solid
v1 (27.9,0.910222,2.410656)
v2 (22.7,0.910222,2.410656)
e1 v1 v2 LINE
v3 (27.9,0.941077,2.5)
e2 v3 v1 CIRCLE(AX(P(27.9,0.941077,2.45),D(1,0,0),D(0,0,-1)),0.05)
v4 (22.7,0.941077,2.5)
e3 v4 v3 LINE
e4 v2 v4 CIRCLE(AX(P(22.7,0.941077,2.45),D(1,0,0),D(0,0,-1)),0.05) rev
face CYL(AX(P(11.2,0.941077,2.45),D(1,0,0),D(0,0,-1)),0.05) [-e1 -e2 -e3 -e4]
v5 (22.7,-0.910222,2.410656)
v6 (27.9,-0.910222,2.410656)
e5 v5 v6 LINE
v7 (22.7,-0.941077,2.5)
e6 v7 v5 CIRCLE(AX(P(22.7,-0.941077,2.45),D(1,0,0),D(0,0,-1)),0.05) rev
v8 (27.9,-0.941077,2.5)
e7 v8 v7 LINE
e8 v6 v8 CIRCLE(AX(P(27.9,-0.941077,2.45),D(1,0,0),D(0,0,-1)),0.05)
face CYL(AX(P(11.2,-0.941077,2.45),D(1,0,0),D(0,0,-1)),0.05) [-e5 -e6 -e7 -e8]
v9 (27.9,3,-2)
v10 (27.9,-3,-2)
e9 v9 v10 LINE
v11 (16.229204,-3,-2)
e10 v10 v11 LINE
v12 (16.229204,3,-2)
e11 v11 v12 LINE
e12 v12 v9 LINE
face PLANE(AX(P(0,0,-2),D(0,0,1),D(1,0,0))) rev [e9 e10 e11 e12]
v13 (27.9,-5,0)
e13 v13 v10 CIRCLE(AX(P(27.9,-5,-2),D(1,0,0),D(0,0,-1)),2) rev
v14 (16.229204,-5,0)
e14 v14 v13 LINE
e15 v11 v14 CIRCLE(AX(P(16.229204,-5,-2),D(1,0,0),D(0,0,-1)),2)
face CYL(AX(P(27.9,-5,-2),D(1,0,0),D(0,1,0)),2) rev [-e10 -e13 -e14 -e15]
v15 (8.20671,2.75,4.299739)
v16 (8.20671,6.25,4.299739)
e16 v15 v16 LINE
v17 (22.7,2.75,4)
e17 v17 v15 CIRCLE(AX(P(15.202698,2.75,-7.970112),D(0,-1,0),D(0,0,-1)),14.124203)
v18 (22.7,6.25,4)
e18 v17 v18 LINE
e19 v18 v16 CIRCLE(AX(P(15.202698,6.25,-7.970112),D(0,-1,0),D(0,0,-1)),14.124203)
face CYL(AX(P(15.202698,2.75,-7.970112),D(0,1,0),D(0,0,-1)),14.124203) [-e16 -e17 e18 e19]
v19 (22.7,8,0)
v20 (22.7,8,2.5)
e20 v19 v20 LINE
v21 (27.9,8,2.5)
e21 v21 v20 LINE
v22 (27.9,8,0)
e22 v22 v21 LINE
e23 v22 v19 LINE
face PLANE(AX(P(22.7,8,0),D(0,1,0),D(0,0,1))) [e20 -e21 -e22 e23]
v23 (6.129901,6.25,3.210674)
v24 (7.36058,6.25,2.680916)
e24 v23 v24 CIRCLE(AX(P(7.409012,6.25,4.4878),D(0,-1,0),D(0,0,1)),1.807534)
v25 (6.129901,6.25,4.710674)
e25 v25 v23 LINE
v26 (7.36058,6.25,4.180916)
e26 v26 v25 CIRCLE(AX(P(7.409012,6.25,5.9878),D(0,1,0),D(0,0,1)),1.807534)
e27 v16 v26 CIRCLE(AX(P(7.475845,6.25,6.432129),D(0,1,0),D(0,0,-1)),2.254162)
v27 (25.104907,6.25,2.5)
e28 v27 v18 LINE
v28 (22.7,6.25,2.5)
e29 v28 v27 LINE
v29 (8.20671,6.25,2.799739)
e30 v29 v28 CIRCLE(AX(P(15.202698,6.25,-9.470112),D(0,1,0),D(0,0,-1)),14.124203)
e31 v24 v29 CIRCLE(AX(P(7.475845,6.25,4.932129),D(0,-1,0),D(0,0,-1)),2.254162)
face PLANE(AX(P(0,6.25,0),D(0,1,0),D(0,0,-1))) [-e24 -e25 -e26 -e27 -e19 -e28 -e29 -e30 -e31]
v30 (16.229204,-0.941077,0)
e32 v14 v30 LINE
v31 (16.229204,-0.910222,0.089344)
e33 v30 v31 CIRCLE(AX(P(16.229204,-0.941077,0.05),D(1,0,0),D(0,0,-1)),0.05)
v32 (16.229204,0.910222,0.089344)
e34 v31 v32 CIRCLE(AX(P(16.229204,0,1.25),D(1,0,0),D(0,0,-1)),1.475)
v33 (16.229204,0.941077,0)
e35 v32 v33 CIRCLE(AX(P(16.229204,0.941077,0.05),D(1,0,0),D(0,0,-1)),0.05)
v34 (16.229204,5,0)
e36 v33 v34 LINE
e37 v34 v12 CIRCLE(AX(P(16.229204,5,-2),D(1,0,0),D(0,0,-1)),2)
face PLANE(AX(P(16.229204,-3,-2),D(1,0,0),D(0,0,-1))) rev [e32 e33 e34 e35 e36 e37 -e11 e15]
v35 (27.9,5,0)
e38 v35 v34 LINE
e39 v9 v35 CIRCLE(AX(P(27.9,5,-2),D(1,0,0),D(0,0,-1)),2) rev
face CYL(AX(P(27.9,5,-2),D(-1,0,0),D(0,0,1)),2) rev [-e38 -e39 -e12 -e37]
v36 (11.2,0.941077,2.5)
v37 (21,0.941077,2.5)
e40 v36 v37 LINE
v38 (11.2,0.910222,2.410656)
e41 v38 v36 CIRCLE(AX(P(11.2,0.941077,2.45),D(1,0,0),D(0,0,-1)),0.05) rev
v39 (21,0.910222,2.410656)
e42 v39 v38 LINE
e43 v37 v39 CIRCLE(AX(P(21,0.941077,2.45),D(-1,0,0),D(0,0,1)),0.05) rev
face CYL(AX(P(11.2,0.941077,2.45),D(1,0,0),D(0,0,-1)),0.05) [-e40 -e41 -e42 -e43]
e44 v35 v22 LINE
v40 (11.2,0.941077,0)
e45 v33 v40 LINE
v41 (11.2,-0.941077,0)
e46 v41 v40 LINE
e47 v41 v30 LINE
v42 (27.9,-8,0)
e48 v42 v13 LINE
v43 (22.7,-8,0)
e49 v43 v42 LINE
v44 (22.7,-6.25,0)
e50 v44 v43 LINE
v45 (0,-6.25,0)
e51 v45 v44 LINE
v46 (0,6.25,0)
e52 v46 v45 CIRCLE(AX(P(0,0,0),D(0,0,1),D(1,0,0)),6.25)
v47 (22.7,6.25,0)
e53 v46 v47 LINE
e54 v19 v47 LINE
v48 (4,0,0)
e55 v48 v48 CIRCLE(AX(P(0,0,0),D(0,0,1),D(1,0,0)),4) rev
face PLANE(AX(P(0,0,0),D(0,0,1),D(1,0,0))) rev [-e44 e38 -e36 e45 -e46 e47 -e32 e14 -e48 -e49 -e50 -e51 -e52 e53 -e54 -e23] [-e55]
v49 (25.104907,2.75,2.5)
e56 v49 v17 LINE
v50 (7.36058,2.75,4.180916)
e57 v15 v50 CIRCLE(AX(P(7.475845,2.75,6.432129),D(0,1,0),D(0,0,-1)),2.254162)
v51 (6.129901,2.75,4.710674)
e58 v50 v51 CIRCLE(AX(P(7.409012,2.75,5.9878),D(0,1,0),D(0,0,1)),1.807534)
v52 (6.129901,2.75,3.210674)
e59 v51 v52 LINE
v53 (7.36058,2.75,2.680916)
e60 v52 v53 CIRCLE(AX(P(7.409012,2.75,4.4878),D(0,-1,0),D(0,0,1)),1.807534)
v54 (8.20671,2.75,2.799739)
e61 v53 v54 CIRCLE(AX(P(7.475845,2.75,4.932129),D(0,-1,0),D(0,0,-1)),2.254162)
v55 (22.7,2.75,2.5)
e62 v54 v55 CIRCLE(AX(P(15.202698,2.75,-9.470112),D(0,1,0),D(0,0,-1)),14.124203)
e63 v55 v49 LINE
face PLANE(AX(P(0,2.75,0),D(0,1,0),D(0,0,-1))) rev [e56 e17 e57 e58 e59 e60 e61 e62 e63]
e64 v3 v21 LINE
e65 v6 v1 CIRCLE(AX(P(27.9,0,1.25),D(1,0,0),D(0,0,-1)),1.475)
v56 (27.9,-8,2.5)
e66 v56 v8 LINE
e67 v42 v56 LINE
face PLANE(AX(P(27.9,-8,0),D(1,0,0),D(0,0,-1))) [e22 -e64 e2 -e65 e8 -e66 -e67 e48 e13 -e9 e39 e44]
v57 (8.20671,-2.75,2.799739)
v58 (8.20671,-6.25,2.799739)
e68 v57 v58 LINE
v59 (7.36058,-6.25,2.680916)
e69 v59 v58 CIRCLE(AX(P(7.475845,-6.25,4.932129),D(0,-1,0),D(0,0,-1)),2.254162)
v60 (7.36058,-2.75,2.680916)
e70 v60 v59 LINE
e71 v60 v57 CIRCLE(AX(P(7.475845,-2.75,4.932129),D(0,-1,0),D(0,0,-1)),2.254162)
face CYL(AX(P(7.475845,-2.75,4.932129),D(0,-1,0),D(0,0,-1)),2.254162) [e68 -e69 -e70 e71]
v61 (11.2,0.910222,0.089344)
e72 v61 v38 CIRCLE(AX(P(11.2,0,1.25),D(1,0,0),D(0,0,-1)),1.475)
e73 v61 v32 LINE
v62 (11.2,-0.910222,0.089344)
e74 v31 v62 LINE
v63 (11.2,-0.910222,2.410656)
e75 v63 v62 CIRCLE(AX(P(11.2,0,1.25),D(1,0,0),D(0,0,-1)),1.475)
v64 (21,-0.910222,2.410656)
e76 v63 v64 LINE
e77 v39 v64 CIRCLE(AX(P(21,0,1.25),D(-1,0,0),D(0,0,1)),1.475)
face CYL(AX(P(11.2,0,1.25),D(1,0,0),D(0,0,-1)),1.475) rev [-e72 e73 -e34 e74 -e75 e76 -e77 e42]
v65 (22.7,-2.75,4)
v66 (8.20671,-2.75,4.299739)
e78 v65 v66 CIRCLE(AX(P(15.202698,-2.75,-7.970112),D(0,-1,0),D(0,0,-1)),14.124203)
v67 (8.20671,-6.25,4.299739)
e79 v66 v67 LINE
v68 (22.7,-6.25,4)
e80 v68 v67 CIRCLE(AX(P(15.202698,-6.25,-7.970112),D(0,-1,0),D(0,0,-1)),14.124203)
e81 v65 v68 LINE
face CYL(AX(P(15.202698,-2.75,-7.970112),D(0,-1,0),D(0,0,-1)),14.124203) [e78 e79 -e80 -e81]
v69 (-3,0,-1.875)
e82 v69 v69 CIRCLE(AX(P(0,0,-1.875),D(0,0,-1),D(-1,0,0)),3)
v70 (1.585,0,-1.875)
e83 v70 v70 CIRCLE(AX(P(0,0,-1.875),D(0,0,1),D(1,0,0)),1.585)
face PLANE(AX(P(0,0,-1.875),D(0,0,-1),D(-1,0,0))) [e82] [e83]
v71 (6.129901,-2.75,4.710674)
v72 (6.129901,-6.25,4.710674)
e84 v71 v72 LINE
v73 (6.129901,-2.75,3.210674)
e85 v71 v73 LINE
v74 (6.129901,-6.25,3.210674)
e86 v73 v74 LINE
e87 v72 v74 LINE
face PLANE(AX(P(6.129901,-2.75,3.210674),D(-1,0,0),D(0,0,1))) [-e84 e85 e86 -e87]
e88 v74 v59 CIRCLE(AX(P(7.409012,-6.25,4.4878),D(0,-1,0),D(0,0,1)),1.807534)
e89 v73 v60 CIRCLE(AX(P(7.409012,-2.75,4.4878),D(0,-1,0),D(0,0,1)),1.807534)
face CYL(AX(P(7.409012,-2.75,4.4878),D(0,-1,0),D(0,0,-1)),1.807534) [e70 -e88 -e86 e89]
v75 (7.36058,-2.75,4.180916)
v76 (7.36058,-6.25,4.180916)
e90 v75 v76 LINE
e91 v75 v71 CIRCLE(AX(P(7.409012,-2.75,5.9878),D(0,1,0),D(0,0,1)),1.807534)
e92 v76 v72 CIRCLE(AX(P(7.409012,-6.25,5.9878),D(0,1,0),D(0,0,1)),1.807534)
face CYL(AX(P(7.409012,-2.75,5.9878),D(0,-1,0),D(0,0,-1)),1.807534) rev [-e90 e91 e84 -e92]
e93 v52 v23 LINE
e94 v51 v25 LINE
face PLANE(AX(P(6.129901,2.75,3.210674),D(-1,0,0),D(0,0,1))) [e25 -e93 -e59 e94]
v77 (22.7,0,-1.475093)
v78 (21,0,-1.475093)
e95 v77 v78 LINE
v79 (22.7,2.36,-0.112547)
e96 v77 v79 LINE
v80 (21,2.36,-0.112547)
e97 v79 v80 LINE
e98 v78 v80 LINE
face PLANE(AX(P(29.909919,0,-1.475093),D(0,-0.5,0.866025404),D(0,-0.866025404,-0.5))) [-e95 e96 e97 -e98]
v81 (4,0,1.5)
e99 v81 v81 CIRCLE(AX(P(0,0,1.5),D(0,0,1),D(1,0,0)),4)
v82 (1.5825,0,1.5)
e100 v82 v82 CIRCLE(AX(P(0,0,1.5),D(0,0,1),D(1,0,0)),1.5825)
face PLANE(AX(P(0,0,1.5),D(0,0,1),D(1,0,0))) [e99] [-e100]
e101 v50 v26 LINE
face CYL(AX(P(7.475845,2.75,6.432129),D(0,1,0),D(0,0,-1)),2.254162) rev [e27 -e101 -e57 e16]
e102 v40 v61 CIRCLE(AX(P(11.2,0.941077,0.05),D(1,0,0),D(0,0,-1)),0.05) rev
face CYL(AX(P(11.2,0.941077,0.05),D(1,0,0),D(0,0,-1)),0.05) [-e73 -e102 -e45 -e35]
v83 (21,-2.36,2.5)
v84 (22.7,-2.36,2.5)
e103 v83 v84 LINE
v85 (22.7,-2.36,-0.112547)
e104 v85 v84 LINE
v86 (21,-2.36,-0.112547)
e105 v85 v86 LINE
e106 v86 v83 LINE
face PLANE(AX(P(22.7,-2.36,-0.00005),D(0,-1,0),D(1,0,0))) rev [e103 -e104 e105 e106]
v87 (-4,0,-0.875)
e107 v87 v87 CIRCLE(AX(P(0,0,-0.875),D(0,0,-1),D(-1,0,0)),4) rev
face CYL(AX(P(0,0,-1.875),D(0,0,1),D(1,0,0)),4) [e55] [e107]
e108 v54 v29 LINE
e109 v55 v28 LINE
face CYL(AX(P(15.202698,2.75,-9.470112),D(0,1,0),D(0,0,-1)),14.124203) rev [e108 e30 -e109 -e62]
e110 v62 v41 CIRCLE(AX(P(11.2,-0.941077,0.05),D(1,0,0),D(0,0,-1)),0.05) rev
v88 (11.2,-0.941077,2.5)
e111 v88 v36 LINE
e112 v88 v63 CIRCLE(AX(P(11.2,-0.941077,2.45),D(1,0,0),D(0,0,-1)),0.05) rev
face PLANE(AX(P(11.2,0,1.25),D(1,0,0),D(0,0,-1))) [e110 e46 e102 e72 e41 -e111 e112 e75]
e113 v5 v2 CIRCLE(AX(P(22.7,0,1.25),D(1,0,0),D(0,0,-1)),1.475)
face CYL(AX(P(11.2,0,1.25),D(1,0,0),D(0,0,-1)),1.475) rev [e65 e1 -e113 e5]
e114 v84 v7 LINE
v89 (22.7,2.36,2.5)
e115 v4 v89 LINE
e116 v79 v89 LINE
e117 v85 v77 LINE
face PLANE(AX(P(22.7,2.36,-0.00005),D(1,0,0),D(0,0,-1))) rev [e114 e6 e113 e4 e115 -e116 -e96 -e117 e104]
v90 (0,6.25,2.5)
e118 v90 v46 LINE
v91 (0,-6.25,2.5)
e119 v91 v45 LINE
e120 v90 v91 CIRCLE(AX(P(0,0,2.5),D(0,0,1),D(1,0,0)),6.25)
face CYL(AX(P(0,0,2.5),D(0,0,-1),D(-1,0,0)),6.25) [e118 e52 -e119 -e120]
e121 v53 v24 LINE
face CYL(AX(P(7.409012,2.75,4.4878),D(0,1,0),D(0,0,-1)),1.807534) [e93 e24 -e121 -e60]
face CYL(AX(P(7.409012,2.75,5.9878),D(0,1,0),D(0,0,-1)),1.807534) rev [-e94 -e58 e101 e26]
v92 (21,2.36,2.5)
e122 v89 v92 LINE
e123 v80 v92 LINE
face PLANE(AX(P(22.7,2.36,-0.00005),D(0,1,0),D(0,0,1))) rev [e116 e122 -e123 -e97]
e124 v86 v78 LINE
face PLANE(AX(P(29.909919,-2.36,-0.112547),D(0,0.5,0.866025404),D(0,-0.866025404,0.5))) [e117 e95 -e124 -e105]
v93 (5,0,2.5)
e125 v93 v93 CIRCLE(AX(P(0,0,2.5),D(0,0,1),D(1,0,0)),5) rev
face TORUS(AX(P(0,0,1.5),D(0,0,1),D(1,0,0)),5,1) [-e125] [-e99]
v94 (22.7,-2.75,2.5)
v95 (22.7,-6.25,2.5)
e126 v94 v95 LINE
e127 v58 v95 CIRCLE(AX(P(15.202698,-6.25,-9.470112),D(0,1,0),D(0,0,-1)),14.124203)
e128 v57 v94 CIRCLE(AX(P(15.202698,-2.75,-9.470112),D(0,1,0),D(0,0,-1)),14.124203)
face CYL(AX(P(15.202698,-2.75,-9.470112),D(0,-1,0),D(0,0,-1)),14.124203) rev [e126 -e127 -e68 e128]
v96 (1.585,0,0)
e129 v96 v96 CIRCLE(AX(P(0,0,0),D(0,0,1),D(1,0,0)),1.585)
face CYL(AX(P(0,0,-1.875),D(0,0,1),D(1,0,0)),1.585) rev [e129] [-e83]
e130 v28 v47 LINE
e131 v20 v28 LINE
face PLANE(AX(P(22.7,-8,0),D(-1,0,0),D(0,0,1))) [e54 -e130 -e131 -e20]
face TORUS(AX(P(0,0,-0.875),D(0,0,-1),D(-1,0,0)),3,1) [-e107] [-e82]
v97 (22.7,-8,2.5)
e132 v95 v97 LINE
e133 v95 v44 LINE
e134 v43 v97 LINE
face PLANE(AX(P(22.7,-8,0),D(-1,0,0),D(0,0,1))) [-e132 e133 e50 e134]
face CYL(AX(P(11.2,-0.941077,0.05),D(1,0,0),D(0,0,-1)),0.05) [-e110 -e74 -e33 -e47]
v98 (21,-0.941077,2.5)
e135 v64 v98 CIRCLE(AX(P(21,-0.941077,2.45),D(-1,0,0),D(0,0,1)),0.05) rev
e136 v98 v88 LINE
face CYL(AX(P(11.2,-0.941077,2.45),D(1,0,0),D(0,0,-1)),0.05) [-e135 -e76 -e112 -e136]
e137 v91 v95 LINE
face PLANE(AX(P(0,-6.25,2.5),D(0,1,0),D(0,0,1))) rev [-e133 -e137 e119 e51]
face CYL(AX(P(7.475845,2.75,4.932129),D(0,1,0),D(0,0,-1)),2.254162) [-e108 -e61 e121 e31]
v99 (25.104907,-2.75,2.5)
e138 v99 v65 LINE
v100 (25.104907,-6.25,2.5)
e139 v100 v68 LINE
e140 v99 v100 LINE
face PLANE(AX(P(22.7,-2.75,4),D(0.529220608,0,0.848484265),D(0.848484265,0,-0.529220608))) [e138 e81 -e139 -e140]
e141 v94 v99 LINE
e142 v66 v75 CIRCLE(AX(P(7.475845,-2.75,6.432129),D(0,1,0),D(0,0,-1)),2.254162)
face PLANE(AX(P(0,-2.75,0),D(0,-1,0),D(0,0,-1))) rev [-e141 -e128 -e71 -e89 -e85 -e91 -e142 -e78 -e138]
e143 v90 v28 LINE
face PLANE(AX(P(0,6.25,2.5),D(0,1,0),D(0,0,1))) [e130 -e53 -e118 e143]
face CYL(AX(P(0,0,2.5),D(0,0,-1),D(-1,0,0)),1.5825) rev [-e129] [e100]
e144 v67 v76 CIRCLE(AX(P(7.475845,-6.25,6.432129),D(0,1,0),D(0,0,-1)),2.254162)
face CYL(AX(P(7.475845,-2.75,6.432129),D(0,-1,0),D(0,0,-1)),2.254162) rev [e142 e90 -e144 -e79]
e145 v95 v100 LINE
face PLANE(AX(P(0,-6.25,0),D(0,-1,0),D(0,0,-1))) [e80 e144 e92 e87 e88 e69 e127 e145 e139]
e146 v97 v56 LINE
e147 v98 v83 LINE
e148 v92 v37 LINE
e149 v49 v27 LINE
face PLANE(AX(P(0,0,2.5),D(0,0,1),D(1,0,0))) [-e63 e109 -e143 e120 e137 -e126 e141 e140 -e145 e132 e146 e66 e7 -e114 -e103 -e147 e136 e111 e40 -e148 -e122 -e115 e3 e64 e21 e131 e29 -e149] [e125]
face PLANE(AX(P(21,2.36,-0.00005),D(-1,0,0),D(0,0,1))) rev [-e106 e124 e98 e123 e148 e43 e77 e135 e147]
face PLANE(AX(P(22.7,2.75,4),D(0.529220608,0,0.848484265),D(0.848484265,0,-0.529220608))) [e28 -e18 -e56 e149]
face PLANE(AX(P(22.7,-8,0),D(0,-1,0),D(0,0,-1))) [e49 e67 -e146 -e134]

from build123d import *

# Parameters (mm, degrees)
SKETCH1_R           = 1.5825
SKETCH1_W           = 10
SKETCH1_H           = 12.5
BOSS_EXTRUDE1_DEPTH = 2.5
SKETCH2_W           = 5.2
SKETCH2_H           = 16
BOSS_EXTRUDE2_DEPTH = 2.5
SKETCH3_W           = 1.7
SKETCH3_H           = 4.72
CUT_EXTRUDE1_DEPTH  = 30.1317696
BOSS_EXTRUDE3_DEPTH = 3.5
BOSS_EXTRUDE5_DEPTH = 3.5
SKETCH10_R          = 4
BOSS_EXTRUDE6_DEPTH = 1.875
SKETCH11_R          = 1.585
CUT_EXTRUDE4_DEPTH  = 30.669560778
SKETCH12_R          = 4
CUT_EXTRUDE5_DEPTH  = 1
FILLET1_R           = 1
FILLET2_R           = 1
SKETCH14_W          = 11.670795551
SKETCH14_H          = 6
BOSS_EXTRUDE7_DEPTH = 2
SKETCH6_R           = 1.475
CUT_EXTRUDE3_DEPTH  = 16.7
CUT_EXTRUDE8_DEPTH  = 1.7
FILLET3_R           = 2
FILLET4_R           = 0.05


with BuildPart() as part:
    # Sketch1 → Boss-Extrude1 (new body)
    # profile 1 of 2: a face of its own
    with BuildSketch(Plane.XY):
        with BuildLine():
            ThreePointArc((0, 6.25), (-6.25, 0), (0, -6.25))
            Line((0, -6.25), (12.7, -6.25))
            Line((12.7, -6.25), (12.7, 6.25))
            Line((12.7, 6.25), (0, 6.25))
        make_face()
        Circle(SKETCH1_R, mode=Mode.SUBTRACT)
    # profile 2 of 2: a face of its own
    with BuildSketch(Plane.XY):
        with Locations((17.7, 0)):
            Rectangle(SKETCH1_W, SKETCH1_H)
    extrude(amount=BOSS_EXTRUDE1_DEPTH)

    # Sketch2 → Boss-Extrude2 (add)
    with BuildSketch(Plane.XY.offset(2.5)):
        with Locations((25.3, 0)):
            Rectangle(SKETCH2_W, SKETCH2_H)
    extrude(amount=-BOSS_EXTRUDE2_DEPTH)

    # Sketch3 → Cut-Extrude1 (cut, through all)
    with BuildSketch(Plane.XY.offset(2.5)):
        with Locations((21.85, 0)):
            Rectangle(SKETCH3_W, SKETCH3_H)
    extrude(amount=-CUT_EXTRUDE1_DEPTH, mode=Mode.SUBTRACT)


with BuildPart() as body_2:
    # Sketch7 → Boss-Extrude3 (new body)
    with BuildSketch(Plane.XZ.offset(6.25)):
        with BuildLine():
            Line((6.129900512, 3.210673711), (6.129900512, 4.710673711))
            ThreePointArc((6.129900512, 4.710673711), (6.694341527, 4.327552018), (7.360579964, 4.180915603))
            ThreePointArc((7.360579964, 4.180915603), (7.789326283, 4.199870579), (8.206709695, 4.299739418))
            ThreePointArc((8.206709695, 4.299739418), (15.494742209, 6.151071465), (22.7, 4))
            Line((22.7, 4), (22.7, 2.5))
            ThreePointArc((22.7, 2.5), (15.494742209, 4.651071465), (8.206709695, 2.799739418))
            ThreePointArc((8.206709695, 2.799739418), (7.789326283, 2.699870579), (7.360579964, 2.680915603))
            ThreePointArc((7.360579964, 2.680915603), (6.694341527, 2.827552018), (6.129900512, 3.210673711))
        make_face()
    extrude(amount=-BOSS_EXTRUDE3_DEPTH)


with BuildPart() as body_3:
    # Sketch9 → Boss-Extrude5 (new body)
    with BuildSketch(Plane.XZ.offset(6.25)):
        Polygon((22.7, 4), (25.104907101, 2.5), (22.7, 2.5), align=None)
    extrude(amount=-BOSS_EXTRUDE5_DEPTH)

    # Combine1: union body 2
    add(body_2.part)


with BuildPart() as body_3_2:
    # Mirror5: mirrored copy
    add(body_3.part.mirror(Plane(origin=(0, 0, 0), x_dir=(0, 0, 1), z_dir=(0, -1, 0))))


with BuildPart() as part_1:
    add(part.part)

    # Combine4: union body 3, body 3 2
    add(body_3.part)
    add(body_3_2.part)

    # Sketch10 → Boss-Extrude6 (add)
    with BuildSketch(Plane(origin=(0, 0, 0), x_dir=(-1, 0, 0), z_dir=(0, 0, -1))):
        with Locations(Location((0, 0, 0), (0, 0, 180))):
            Circle(SKETCH10_R)
    extrude(amount=BOSS_EXTRUDE6_DEPTH)

    # Sketch11 → Cut-Extrude4 (cut, through all)
    with BuildSketch(Plane.XY):
        Circle(SKETCH11_R)
    extrude(amount=-CUT_EXTRUDE4_DEPTH, mode=Mode.SUBTRACT)

    # Sketch12 → Cut-Extrude5 (cut)
    with BuildSketch(Plane.XY.offset(2.5)):
        Circle(SKETCH12_R)
    extrude(amount=-CUT_EXTRUDE5_DEPTH, mode=Mode.SUBTRACT)

    # Fillet1
    fillet1_edges = [part_1.edges().sort_by_distance(p)[0] for p in [
        (-4, 0, 2.5),
    ]]
    fillet(fillet1_edges, radius=FILLET1_R - 0.0001)  # a hair under: the kernel refuses the full size

    # Fillet2
    fillet2_edges = [part_1.edges().sort_by_distance(p)[0] for p in [
        (-4, 0, -1.875),
    ]]
    fillet(fillet2_edges, radius=FILLET2_R)

    # Sketch14 → Boss-Extrude7 (add)
    with BuildSketch(Plane(origin=(0, 0, 0), x_dir=(-1, 0, 0), z_dir=(0, 0, -1))):
        with Locations((-22.064602224, 0)):
            Rectangle(SKETCH14_W, SKETCH14_H)
    extrude(amount=BOSS_EXTRUDE7_DEPTH)

    # Sketch6 → Cut-Extrude3 (cut)
    with BuildSketch(Plane(origin=(27.9, 0, 0), x_dir=(0, 0, -1), z_dir=(1, 0, 0))):
        with Locations((-1.25, 0)):
            Circle(SKETCH6_R)
    extrude(amount=-CUT_EXTRUDE3_DEPTH, mode=Mode.SUBTRACT)

    # Sketch16 → Cut-Extrude8 (cut)
    with BuildSketch(Plane(origin=(21, 0, 0), x_dir=(0, 0, -1), z_dir=(1, 0, 0))):
        Polygon((1.475093271, 0), (0.112546635, 2.36), (-2.612546635, 2.36), (-3.975093271, 0), (-2.612546635, -2.36), (0.112546635, -2.36), align=None)
    extrude(amount=CUT_EXTRUDE8_DEPTH, mode=Mode.SUBTRACT)

    # Fillet3
    fillet3_edges = [part_1.edges().sort_by_distance(p)[0] for p in [
        (22.064602225, -3, 0),
        (22.064602225, 3, 0),
    ]]
    fillet(fillet3_edges, radius=FILLET3_R - 0.0001)  # a hair under: the kernel refuses the full size

    # Fillet4
    fillet4_edges = [part_1.edges().sort_by_distance(p)[0] for p in [
        (16.1, -0.783022988, 2.5),
        (25.3, -0.783022988, 2.5),
        (25.3, 0.783022988, 2.5),
        (16.1, 0.783022988, 2.5),
        (13.714602225, -0.783022988, 0),
        (13.714602225, 0.783022988, 0),
    ]]
    fillet(fillet4_edges, radius=FILLET4_R)


solid = part_1.part
